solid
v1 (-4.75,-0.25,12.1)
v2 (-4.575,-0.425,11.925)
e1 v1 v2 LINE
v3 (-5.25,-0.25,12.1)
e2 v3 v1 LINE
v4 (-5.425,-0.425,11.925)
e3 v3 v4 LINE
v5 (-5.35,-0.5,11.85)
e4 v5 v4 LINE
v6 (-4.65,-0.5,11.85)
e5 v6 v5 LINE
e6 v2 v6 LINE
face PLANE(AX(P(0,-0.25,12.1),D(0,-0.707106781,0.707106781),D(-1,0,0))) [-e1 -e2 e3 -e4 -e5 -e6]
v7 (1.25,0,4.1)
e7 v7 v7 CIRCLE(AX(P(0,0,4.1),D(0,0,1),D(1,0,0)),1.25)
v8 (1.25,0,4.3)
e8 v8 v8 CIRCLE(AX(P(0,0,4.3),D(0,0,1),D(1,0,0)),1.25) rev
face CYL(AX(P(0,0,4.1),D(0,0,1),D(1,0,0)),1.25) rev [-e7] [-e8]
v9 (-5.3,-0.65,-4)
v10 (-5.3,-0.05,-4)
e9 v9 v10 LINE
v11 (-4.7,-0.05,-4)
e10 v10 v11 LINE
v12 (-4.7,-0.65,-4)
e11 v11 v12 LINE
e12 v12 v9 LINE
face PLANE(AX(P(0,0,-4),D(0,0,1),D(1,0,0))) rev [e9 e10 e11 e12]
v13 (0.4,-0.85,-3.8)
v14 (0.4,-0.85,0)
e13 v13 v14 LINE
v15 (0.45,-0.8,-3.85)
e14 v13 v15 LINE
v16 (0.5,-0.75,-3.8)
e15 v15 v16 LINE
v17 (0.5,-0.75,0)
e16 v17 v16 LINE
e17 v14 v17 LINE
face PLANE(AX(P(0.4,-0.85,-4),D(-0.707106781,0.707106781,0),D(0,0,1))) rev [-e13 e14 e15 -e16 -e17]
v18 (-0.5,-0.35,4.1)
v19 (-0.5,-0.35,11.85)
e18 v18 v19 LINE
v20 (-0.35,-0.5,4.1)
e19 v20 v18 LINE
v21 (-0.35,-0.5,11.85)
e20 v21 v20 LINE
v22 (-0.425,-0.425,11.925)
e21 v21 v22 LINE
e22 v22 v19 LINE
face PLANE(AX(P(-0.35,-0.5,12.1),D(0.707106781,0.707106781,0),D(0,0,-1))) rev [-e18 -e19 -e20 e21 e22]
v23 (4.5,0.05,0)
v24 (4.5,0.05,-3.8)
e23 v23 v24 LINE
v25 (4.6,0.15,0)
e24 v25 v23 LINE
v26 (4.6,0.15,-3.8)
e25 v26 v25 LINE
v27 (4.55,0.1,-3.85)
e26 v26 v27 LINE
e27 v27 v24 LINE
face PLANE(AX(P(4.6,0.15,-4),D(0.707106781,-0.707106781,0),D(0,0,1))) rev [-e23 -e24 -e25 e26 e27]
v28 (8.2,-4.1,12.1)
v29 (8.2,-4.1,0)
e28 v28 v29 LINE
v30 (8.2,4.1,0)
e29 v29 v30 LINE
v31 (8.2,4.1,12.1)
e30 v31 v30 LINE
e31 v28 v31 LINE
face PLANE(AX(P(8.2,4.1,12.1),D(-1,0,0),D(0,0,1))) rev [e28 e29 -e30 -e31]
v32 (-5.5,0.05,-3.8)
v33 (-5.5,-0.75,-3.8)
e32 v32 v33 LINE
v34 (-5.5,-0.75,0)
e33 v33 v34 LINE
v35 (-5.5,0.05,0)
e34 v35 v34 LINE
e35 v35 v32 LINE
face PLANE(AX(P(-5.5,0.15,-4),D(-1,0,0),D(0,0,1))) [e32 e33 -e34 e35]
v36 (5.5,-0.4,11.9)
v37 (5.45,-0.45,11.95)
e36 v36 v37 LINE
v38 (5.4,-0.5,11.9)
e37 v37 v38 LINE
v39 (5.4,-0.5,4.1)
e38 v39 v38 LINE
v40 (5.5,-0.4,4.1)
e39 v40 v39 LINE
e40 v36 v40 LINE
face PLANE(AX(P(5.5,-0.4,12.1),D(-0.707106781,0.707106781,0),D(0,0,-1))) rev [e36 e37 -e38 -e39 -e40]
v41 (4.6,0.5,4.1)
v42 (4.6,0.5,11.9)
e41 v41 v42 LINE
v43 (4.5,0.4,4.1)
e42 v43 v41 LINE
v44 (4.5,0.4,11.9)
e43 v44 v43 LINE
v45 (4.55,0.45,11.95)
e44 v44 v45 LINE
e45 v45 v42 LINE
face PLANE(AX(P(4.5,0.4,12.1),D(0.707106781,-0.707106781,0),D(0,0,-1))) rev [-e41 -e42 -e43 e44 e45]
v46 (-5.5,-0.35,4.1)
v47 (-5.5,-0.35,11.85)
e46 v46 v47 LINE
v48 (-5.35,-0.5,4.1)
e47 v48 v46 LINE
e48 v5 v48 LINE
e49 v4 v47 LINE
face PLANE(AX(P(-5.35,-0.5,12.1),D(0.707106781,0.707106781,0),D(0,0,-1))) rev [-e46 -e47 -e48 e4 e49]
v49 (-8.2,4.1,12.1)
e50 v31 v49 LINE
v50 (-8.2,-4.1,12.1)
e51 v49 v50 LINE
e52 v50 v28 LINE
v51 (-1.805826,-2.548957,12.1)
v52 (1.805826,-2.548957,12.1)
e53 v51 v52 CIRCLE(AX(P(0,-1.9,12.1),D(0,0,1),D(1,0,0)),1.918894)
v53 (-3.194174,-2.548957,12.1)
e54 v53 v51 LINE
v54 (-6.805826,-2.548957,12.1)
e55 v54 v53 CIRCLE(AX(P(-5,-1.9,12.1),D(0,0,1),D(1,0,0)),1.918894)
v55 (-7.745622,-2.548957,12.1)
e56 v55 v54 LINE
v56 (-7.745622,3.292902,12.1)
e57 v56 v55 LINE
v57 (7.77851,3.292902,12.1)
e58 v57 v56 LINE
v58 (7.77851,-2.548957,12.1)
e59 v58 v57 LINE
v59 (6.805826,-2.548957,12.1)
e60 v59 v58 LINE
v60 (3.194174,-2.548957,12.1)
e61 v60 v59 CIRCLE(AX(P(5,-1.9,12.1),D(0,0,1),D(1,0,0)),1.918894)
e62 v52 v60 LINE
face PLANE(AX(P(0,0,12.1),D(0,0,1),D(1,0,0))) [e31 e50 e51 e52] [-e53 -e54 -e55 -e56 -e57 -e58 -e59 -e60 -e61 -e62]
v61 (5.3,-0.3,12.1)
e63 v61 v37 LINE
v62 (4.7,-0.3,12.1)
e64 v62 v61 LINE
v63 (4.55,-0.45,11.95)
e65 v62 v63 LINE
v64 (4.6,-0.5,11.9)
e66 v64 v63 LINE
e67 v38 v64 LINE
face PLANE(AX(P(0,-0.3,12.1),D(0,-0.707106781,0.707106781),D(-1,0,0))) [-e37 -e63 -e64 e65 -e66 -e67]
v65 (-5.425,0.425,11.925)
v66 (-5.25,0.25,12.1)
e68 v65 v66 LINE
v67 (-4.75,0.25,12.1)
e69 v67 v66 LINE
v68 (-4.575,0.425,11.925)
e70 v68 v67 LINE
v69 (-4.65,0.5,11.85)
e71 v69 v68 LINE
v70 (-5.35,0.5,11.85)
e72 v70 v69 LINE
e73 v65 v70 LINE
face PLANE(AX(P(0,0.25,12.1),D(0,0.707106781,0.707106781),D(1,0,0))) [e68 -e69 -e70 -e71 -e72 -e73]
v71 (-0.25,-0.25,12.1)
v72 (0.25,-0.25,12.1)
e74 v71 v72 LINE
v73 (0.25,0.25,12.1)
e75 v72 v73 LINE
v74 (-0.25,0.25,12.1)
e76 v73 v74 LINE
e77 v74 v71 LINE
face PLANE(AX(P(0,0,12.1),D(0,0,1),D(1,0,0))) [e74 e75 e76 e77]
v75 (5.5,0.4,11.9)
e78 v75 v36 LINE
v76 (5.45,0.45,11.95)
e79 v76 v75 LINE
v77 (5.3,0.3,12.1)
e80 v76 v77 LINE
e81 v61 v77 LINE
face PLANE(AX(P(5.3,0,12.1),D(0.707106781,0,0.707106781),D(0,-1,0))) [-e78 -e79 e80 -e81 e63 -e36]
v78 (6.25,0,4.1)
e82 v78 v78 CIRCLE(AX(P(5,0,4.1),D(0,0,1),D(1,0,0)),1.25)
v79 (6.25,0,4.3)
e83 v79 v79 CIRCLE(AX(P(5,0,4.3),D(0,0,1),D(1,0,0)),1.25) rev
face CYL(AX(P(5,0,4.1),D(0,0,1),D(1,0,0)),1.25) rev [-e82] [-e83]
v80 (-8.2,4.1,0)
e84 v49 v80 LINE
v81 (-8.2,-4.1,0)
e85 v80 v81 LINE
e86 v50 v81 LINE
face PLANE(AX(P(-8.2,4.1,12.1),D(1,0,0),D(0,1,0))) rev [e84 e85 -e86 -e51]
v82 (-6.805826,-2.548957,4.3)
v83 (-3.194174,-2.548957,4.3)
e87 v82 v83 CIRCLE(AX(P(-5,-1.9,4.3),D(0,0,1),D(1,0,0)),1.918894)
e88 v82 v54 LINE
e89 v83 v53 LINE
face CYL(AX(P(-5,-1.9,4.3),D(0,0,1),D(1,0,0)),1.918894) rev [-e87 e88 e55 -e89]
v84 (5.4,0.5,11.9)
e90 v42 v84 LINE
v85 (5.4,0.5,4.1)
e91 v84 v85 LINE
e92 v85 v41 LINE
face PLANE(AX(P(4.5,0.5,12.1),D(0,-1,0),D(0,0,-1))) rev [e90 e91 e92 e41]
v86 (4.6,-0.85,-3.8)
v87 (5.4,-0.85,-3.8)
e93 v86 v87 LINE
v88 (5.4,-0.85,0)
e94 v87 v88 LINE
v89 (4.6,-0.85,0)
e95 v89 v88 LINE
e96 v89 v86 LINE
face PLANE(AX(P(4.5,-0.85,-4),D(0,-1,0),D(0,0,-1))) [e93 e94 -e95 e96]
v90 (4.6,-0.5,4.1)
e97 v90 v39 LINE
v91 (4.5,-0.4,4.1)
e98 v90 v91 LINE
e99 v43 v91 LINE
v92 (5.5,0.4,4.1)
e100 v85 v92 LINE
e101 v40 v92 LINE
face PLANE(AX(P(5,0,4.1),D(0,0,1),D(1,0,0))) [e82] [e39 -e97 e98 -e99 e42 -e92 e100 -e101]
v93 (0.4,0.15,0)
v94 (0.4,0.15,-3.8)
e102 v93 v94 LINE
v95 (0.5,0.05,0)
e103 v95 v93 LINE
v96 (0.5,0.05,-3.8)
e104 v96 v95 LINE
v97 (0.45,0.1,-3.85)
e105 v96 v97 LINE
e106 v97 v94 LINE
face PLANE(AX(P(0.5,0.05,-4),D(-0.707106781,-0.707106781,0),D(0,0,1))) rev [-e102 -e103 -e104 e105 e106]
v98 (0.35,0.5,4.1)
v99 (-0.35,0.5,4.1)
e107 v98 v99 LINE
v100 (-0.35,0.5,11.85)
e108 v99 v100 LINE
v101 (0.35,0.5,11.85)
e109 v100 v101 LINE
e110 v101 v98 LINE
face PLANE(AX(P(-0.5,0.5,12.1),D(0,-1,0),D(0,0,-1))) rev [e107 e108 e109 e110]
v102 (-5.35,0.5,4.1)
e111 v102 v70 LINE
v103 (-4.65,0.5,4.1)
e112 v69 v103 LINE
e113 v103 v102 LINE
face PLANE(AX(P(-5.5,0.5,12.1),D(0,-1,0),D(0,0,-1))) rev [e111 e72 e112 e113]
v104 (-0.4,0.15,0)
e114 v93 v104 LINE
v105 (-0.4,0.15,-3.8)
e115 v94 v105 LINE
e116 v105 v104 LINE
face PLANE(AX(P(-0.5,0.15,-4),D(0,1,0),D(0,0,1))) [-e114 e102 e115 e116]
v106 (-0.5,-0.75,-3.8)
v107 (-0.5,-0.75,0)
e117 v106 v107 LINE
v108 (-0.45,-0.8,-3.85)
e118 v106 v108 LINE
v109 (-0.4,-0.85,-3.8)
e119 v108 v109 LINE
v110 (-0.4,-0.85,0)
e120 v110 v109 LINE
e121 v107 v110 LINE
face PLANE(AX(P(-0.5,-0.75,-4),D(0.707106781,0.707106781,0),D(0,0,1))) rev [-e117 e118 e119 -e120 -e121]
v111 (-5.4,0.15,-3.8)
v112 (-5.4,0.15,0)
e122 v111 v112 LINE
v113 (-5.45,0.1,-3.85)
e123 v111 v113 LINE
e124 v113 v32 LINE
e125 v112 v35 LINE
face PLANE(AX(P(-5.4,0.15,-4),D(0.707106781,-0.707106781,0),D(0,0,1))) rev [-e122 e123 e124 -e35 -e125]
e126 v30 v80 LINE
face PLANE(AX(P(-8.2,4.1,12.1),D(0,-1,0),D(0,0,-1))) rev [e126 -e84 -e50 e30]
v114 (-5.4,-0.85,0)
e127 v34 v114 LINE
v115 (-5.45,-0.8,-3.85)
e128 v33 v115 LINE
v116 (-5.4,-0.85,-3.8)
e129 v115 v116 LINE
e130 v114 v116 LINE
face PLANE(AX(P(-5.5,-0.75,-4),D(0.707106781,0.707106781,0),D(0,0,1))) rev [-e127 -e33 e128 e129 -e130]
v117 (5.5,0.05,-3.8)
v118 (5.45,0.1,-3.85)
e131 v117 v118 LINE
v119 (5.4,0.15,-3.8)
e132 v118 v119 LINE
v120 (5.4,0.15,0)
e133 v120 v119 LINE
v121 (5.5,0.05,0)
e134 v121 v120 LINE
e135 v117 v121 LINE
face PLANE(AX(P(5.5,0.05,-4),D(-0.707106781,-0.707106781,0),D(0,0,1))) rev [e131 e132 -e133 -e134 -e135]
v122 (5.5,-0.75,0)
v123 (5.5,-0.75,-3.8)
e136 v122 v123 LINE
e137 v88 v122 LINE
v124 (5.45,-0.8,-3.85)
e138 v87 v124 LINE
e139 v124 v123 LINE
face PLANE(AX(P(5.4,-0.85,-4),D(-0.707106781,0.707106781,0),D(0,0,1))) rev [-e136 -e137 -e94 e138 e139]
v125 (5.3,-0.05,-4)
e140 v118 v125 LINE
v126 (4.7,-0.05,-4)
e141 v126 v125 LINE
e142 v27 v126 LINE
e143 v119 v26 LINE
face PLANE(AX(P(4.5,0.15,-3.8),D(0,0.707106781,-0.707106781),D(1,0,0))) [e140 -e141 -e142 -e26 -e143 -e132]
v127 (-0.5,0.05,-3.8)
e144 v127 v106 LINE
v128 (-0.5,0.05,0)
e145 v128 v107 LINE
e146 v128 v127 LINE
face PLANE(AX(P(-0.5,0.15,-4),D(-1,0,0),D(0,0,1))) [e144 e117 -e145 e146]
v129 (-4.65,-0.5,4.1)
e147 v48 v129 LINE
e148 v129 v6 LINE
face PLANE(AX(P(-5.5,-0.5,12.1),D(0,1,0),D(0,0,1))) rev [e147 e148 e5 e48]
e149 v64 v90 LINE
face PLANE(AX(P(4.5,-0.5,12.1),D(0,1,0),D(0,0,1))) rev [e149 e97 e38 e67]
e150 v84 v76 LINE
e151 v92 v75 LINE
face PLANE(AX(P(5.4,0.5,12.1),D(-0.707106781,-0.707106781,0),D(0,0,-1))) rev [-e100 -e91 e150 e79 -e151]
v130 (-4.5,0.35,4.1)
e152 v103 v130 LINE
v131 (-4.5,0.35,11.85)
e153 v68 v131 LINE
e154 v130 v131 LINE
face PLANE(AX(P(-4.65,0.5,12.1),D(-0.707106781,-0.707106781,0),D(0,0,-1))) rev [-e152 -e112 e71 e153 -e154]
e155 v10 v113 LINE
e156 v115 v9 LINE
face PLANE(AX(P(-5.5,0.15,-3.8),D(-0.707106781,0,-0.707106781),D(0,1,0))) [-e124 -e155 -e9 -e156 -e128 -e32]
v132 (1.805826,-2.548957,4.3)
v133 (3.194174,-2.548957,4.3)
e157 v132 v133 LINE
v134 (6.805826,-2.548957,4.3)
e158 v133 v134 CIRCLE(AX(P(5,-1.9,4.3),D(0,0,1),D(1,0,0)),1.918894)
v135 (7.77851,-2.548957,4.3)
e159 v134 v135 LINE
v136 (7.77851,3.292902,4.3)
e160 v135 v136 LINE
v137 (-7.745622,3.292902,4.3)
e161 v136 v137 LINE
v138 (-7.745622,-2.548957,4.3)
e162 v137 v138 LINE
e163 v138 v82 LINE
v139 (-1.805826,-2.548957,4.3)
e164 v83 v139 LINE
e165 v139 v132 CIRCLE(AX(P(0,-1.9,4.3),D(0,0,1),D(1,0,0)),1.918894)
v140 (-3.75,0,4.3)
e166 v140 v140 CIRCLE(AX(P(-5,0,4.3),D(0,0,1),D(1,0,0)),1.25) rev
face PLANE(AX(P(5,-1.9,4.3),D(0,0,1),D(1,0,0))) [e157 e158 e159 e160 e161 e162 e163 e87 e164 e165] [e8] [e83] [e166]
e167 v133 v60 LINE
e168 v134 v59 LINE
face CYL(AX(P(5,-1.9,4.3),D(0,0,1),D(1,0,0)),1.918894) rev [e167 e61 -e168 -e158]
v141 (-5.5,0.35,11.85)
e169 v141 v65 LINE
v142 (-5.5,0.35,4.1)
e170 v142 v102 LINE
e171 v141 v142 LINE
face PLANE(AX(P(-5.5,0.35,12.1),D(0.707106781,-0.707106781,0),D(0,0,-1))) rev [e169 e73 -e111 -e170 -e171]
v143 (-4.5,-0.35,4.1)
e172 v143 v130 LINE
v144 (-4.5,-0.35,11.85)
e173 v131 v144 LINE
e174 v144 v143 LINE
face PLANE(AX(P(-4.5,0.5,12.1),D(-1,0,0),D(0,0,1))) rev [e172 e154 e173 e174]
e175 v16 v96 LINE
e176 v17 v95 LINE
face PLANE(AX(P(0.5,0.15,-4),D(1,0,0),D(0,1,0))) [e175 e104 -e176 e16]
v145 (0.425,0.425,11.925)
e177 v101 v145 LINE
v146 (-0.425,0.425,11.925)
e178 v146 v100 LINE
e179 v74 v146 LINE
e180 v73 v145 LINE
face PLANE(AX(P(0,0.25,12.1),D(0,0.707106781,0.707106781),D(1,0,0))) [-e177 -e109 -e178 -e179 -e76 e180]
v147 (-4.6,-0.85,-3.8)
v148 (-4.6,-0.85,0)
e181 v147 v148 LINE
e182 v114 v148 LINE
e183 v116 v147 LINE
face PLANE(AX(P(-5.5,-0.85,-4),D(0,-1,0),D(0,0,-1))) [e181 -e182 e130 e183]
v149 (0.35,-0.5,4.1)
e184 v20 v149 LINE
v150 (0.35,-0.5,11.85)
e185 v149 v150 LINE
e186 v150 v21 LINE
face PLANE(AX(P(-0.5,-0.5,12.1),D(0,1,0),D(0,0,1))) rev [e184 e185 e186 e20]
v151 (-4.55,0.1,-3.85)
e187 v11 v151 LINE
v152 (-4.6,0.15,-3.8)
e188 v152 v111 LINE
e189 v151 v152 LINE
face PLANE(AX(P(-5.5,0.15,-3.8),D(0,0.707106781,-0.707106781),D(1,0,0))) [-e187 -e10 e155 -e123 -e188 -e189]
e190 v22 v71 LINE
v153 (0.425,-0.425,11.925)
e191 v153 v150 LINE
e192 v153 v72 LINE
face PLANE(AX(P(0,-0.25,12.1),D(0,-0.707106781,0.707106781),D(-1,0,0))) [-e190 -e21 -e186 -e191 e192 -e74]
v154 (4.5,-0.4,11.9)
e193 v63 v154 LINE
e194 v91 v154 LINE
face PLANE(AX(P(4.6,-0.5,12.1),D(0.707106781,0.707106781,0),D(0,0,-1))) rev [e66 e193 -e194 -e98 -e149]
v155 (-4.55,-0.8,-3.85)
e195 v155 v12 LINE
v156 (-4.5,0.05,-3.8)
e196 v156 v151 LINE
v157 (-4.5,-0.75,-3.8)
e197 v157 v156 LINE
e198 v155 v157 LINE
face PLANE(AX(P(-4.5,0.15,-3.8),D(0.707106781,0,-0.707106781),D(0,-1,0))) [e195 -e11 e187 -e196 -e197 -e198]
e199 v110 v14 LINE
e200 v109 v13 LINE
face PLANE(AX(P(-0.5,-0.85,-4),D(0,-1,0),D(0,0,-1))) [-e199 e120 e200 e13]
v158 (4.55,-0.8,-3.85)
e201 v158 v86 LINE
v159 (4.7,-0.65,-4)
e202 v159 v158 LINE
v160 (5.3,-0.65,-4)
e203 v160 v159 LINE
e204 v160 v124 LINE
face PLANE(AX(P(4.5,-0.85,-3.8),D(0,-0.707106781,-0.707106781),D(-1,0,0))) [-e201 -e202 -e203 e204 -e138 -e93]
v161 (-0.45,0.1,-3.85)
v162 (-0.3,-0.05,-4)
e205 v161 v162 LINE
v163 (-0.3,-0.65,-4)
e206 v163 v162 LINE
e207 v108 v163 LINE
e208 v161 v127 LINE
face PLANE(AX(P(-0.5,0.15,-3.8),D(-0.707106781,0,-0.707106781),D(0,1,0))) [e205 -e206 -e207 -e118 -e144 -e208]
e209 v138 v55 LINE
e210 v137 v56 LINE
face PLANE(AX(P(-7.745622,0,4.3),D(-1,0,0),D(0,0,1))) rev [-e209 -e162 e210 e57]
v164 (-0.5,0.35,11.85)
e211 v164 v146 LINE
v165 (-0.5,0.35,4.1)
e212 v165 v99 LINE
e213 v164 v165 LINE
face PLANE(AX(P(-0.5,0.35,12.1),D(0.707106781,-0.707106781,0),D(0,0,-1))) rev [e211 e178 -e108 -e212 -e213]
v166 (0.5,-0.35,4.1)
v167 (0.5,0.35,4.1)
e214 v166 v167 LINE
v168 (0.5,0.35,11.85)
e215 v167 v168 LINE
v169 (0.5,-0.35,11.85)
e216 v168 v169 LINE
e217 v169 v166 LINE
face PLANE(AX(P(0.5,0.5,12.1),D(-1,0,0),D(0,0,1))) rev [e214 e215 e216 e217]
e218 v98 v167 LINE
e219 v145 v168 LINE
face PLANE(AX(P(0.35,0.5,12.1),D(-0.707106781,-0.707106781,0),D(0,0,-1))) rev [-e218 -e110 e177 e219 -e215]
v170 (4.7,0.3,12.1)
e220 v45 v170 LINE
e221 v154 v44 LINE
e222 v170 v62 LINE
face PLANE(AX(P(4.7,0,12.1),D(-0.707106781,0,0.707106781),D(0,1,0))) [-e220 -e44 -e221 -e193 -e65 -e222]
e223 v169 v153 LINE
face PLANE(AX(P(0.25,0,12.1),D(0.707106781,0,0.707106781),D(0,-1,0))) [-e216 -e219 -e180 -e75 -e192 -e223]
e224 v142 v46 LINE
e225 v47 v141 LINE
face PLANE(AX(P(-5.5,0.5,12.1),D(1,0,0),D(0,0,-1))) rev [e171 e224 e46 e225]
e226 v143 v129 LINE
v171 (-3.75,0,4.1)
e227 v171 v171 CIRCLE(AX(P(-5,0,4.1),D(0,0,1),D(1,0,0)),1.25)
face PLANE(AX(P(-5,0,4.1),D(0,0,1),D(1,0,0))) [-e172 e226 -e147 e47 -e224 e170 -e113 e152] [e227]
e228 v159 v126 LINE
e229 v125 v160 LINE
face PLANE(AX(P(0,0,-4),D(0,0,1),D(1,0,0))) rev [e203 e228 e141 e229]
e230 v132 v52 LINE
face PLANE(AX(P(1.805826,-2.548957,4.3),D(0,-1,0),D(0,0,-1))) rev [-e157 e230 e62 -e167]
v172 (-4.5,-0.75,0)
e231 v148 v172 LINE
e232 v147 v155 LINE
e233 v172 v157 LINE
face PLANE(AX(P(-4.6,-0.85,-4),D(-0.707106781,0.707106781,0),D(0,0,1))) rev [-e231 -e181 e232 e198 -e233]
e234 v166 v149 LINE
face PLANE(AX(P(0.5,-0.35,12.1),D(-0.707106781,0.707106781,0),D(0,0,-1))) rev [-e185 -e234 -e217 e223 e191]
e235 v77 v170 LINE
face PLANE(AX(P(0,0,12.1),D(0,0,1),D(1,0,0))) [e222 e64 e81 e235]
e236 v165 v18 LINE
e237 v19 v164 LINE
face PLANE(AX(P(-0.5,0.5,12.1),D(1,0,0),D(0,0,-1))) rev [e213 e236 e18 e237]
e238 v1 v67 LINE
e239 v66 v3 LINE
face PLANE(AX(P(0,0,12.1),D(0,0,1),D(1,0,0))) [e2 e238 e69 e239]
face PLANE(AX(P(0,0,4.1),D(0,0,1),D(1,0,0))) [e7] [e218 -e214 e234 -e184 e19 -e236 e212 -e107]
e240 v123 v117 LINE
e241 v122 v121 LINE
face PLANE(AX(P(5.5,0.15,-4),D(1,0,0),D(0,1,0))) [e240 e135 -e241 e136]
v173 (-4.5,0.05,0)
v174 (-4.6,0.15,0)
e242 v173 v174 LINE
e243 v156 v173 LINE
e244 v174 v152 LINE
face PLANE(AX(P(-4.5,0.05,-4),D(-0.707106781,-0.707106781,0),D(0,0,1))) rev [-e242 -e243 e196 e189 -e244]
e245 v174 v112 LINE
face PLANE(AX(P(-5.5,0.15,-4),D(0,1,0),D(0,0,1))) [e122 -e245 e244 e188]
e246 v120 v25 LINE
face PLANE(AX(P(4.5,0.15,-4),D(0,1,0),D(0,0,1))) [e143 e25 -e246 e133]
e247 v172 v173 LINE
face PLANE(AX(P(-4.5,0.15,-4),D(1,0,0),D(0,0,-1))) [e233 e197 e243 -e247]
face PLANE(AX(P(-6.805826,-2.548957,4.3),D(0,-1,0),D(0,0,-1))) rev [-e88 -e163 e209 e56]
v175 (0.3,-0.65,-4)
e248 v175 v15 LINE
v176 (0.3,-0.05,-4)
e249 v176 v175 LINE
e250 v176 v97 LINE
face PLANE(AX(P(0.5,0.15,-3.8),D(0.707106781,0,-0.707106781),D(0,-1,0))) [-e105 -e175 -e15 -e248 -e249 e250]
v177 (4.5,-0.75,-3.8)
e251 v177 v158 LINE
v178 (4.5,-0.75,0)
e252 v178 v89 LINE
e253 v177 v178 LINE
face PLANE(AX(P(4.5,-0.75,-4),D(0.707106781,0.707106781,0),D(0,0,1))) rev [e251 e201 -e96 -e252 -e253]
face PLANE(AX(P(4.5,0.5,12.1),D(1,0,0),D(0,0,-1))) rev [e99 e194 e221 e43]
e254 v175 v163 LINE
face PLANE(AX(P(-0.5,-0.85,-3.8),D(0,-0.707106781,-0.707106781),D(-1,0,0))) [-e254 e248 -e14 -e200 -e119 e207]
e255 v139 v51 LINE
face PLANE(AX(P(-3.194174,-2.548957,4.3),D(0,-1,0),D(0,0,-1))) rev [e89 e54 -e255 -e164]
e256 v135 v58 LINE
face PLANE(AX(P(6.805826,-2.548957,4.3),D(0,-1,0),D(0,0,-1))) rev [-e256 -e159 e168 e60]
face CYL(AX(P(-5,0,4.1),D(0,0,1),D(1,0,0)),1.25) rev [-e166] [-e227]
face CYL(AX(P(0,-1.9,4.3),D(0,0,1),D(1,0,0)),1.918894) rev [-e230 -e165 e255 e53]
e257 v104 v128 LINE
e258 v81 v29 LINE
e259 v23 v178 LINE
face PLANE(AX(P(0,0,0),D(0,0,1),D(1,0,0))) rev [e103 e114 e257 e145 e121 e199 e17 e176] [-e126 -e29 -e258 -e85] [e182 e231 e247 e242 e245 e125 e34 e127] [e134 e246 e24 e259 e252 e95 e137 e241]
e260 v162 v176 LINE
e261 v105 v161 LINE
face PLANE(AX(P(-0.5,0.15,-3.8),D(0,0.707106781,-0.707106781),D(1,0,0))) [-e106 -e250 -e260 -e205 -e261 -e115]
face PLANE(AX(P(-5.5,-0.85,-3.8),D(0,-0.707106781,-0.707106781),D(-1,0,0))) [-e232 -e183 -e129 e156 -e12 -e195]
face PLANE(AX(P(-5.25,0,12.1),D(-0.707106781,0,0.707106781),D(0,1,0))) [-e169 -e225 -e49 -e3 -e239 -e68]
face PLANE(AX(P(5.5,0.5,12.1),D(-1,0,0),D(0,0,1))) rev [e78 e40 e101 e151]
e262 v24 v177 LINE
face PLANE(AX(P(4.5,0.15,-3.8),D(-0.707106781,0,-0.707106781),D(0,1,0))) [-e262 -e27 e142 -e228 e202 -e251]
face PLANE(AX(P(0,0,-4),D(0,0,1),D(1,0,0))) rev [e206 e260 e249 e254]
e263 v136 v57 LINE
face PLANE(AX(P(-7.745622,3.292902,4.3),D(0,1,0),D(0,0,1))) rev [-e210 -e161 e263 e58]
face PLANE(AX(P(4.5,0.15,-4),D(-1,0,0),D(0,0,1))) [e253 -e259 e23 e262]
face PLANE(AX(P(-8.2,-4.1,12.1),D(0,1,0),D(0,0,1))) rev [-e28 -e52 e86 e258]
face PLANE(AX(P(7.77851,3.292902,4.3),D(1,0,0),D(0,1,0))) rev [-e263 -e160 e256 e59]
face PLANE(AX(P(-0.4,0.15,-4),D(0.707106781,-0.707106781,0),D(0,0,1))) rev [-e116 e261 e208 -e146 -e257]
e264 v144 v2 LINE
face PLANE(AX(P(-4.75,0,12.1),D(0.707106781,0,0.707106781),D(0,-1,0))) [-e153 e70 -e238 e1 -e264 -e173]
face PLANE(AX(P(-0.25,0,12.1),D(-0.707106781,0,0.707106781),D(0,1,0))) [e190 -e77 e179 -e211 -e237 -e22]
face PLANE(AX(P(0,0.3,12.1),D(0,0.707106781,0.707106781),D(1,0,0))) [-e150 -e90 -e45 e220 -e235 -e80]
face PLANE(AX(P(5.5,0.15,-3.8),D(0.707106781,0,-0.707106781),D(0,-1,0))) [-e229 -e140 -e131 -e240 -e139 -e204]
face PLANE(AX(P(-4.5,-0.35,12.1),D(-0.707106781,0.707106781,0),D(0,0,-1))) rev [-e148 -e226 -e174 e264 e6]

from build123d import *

# Parameters (mm, degrees)
SKETCH_1_W          = 16.4
SKETCH_1_H          = 8.2
EXTRUDE_1_DEPTH     = 12.1
SKETCH_4_R          = 1.25
CUT_EXTRUDE_3_DEPTH = 8
CUT_EXTRUDE_4_DEPTH = 7.8
SKETCH_7_W          = 1
SKETCH_7_H          = 1
EXTRUDE_2_DEPTH     = 8
CHAMFER_1_SIZE      = 0.15
CHAMFER_2_SIZE      = 0.25
SKETCH_8_W          = 1
SKETCH_8_H          = 1
EXTRUDE_3_DEPTH     = 4
CHAMFER_6_SIZE      = 0.1
CHAMFER_7_SIZE      = 0.2
CHAMFER_10_SIZE     = 0.1
CHAMFER_11_SIZE     = 0.2


with BuildPart() as part:
    # Эскиз1 → Бобышка-Вытянуть1 (new body)
    with BuildSketch(Plane.XY):
        Rectangle(SKETCH_1_W, SKETCH_1_H)
    extrude(amount=EXTRUDE_1_DEPTH)

    # Эскиз4 → Вырез-Вытянуть3 (cut)
    with BuildSketch(Plane.XY.offset(12.1)):
        with Locations((-5, 0)):
            Circle(SKETCH_4_R)
        Circle(SKETCH_4_R)
        with Locations((5, 0)):
            Circle(SKETCH_4_R)
    extrude(amount=-CUT_EXTRUDE_3_DEPTH, mode=Mode.SUBTRACT)

    # Эскиз5 → Вырез-Вытянуть4 (cut)
    with BuildSketch(Plane.XY.offset(12.1)):
        with BuildLine():
            Line((-7.745621634, 0), (-7.745621634, 3.292901982))
            Line((-7.745621634, 3.292901982), (2.778509544, 3.292901982))
            Line((2.778509544, 3.292901982), (7.778509544, 3.292901982))
            Line((7.778509544, 3.292901982), (7.778509544, -2.548957219))
            Line((7.778509544, -2.548957219), (6.80582632, -2.548957219))
            ThreePointArc((6.80582632, -2.548957219), (5, -3.818893996), (3.19417368, -2.548957219))
            Line((3.19417368, -2.548957219), (1.80582632, -2.548957219))
            ThreePointArc((1.80582632, -2.548957219), (0, -3.818893996), (-1.80582632, -2.548957219))
            Line((-1.80582632, -2.548957219), (-3.19417368, -2.548957219))
            ThreePointArc((-3.19417368, -2.548957219), (-5, -3.818893996), (-6.80582632, -2.548957219))
            Line((-6.80582632, -2.548957219), (-7.745621634, -2.548957219))
            Line((-7.745621634, -2.548957219), (-7.745621634, 0))
        make_face()
    extrude(amount=-CUT_EXTRUDE_4_DEPTH, mode=Mode.SUBTRACT)

    # Эскиз7 → Бобышка-Вытянуть2 (add)
    with BuildSketch(Plane.XY.offset(4.1)):
        Rectangle(SKETCH_7_W, SKETCH_7_H)
        with Locations((-5, 0)):
            Rectangle(SKETCH_7_W, SKETCH_7_H)
        with Locations((5, 0)):
            Rectangle(SKETCH_7_W, SKETCH_7_H)
    extrude(amount=EXTRUDE_2_DEPTH)

    # Фаска1
    chamfer_1_edges = [part.edges().sort_by_distance(p)[0] for p in [
        (-4.5, -0.5, 8.1),
        (-4.5, 0.5, 8.1),
        (-5.5, 0.5, 8.1),
        (-5.5, -0.5, 8.1),
        (0.5, -0.5, 8.1),
        (0.5, 0.5, 8.1),
        (-0.5, 0.5, 8.1),
        (-0.5, -0.5, 8.1),
    ]]
    chamfer(chamfer_1_edges, length=CHAMFER_1_SIZE)

    # Фаска2
    # the kernel refuses this chamfer: 0.25 mm, written as the material it takes off along each edge
    with BuildSketch(Plane(origin=(-0.5, -0.992920747, 12.1), x_dir=(-0.027495876610586414, 0, -0.9996219169112968), z_dir=(0, 1, 0)), Plane(origin=(-0.992920747, 0.5, 12.1), x_dir=(0, 0.027495876610586414, -0.9996219169112968), z_dir=(1, 0, 0)), Plane(origin=(0.5, 0.992920747, 12.1), x_dir=(0.027495876610586414, 0, -0.9996219169112968), z_dir=(0, -1, 0)), Plane(origin=(0.992920747, -0.5, 12.1), x_dir=(0, -0.027495876610586414, -0.9996219169112968), z_dir=(-1, 0, 0)), Plane(origin=(-4.5, 0.992920747, 12.1), x_dir=(0.02749587661058555, 0, -0.9996219169112968), z_dir=(0, -1, 0)), Plane(origin=(-4.007079253, -0.5, 12.1), x_dir=(0, -0.027495876610586414, -0.9996219169112968), z_dir=(-1, 0, 0)), Plane(origin=(-5.5, -0.992920747, 12.1), x_dir=(-0.02749587661058555, 0, -0.9996219169112968), z_dir=(0, 1, 0)), Plane(origin=(-5.992920747, 0.5, 12.1), x_dir=(0, 0.027495876610586414, -0.9996219169112968), z_dir=(1, 0, 0))) as chamfer_2_piece_1:
        Polygon((CHAMFER_2_SIZE * 0.999621916911, -CHAMFER_2_SIZE * 0.0274958766106), (-CHAMFER_2_SIZE * 0.0274958766106, -CHAMFER_2_SIZE * 0.999621916911), (0, 0), align=None)
    extrude(amount=1.985841494, mode=Mode.SUBTRACT)

    # Эскиз8 → Бобышка-Вытянуть3 (add)
    with BuildSketch(Plane(origin=(0, -4.1, 0), x_dir=(-1, 0, 0), z_dir=(0, 0, 1))):
        with Locations((0, -3.75)):
            Rectangle(SKETCH_8_W, SKETCH_8_H)
        with Locations((5, -3.75)):
            Rectangle(SKETCH_8_W, SKETCH_8_H)
        with Locations((-5, -3.75)):
            Rectangle(SKETCH_8_W, SKETCH_8_H)
    extrude(amount=-EXTRUDE_3_DEPTH)

    # Фаска6
    chamfer_6_edges = [part.edges().sort_by_distance(p)[0] for p in [
        (5.5, -0.5, 8.1),
        (5.5, 0.5, 8.1),
        (4.5, 0.5, 8.1),
        (4.5, -0.5, 8.1),
    ]]
    chamfer(chamfer_6_edges, length=CHAMFER_6_SIZE)

    # Фаска7
    # the kernel refuses this chamfer: 0.2 mm, written as the material it takes off along each edge
    with BuildSketch(Plane(origin=(5.5, 0.914336598, 12.1), x_dir=(0.02749587661058742, 0, -0.9996219169112966), z_dir=(0, -1, 0)), Plane(origin=(5.914336598, -0.5, 12.1), x_dir=(0, -0.02749587661058634, -0.9996219169112966), z_dir=(-1, 0, 0)), Plane(origin=(4.5, -0.914336598, 12.1), x_dir=(-0.02749587661058742, 0, -0.9996219169112966), z_dir=(0, 1, 0)), Plane(origin=(4.085663402, 0.5, 12.1), x_dir=(0, 0.02749587661058634, -0.9996219169112966), z_dir=(1, 0, 0))) as chamfer_7_piece_1:
        Polygon((CHAMFER_7_SIZE * 0.999621916911, -CHAMFER_7_SIZE * 0.0274958766106), (-CHAMFER_7_SIZE * 0.0274958766106, -CHAMFER_7_SIZE * 0.999621916911), (0, 0), align=None)
    extrude(amount=1.828673195, mode=Mode.SUBTRACT)

    # Фаска10
    chamfer_10_edges = [part.edges().sort_by_distance(p)[0] for p in [
        (-4.5, 0.15, -2),
        (-4.5, -0.85, -2),
        (-5.5, -0.85, -2),
        (-5.5, 0.15, -2),
        (0.5, 0.15, -2),
        (0.5, -0.85, -2),
        (-0.5, -0.85, -2),
        (-0.5, 0.15, -2),
        (5.5, 0.15, -2),
        (5.5, -0.85, -2),
        (4.5, -0.85, -2),
        (4.5, 0.15, -2),
    ]]
    chamfer(chamfer_10_edges, length=CHAMFER_10_SIZE)

    # Фаска11
    # the kernel refuses this chamfer: 0.2 mm, written as the material it takes off along each edge
    with BuildSketch(Plane(origin=(-4.5, 0.564336598, -4), x_dir=(0.027495876610587302, 0, 0.9996219169112966), z_dir=(0, -1, 0)), Plane(origin=(-5.914336598, 0.15, -4), x_dir=(0, 0.027495876610586355, 0.9996219169112966), z_dir=(1, 0, 0)), Plane(origin=(-5.5, -1.264336598, -4), x_dir=(-0.027495876610587302, 0, 0.9996219169112966), z_dir=(0, 1, 0)), Plane(origin=(-4.085663402, -0.85, -4), x_dir=(0, -0.027495876610586223, 0.9996219169112966), z_dir=(-1, 0, 0)), Plane(origin=(0.914336598, -0.85, -4), x_dir=(0, -0.027495876610586223, 0.9996219169112966), z_dir=(-1, 0, 0)), Plane(origin=(-0.5, -1.264336598, -4), x_dir=(-0.027495876610586223, 0, 0.9996219169112966), z_dir=(0, 1, 0)), Plane(origin=(-0.914336598, 0.15, -4), x_dir=(0, 0.027495876610586355, 0.9996219169112966), z_dir=(1, 0, 0)), Plane(origin=(0.5, 0.564336598, -4), x_dir=(0.027495876610586223, 0, 0.9996219169112966), z_dir=(0, -1, 0)), Plane(origin=(4.5, -1.264336598, -4), x_dir=(-0.027495876610587302, 0, 0.9996219169112966), z_dir=(0, 1, 0)), Plane(origin=(4.085663402, 0.15, -4), x_dir=(0, 0.027495876610586355, 0.9996219169112966), z_dir=(1, 0, 0)), Plane(origin=(5.5, 0.564336598, -4), x_dir=(0.027495876610587302, 0, 0.9996219169112966), z_dir=(0, -1, 0)), Plane(origin=(5.914336598, -0.85, -4), x_dir=(0, -0.027495876610586223, 0.9996219169112966), z_dir=(-1, 0, 0))) as chamfer_11_piece_1:
        Polygon((CHAMFER_11_SIZE * 0.999621916911, CHAMFER_11_SIZE * 0.0274958766106), (-CHAMFER_11_SIZE * 0.0274958766106, CHAMFER_11_SIZE * 0.999621916911), (0, 0), align=None)
    extrude(amount=1.828673195, mode=Mode.SUBTRACT)


solid = part.part
